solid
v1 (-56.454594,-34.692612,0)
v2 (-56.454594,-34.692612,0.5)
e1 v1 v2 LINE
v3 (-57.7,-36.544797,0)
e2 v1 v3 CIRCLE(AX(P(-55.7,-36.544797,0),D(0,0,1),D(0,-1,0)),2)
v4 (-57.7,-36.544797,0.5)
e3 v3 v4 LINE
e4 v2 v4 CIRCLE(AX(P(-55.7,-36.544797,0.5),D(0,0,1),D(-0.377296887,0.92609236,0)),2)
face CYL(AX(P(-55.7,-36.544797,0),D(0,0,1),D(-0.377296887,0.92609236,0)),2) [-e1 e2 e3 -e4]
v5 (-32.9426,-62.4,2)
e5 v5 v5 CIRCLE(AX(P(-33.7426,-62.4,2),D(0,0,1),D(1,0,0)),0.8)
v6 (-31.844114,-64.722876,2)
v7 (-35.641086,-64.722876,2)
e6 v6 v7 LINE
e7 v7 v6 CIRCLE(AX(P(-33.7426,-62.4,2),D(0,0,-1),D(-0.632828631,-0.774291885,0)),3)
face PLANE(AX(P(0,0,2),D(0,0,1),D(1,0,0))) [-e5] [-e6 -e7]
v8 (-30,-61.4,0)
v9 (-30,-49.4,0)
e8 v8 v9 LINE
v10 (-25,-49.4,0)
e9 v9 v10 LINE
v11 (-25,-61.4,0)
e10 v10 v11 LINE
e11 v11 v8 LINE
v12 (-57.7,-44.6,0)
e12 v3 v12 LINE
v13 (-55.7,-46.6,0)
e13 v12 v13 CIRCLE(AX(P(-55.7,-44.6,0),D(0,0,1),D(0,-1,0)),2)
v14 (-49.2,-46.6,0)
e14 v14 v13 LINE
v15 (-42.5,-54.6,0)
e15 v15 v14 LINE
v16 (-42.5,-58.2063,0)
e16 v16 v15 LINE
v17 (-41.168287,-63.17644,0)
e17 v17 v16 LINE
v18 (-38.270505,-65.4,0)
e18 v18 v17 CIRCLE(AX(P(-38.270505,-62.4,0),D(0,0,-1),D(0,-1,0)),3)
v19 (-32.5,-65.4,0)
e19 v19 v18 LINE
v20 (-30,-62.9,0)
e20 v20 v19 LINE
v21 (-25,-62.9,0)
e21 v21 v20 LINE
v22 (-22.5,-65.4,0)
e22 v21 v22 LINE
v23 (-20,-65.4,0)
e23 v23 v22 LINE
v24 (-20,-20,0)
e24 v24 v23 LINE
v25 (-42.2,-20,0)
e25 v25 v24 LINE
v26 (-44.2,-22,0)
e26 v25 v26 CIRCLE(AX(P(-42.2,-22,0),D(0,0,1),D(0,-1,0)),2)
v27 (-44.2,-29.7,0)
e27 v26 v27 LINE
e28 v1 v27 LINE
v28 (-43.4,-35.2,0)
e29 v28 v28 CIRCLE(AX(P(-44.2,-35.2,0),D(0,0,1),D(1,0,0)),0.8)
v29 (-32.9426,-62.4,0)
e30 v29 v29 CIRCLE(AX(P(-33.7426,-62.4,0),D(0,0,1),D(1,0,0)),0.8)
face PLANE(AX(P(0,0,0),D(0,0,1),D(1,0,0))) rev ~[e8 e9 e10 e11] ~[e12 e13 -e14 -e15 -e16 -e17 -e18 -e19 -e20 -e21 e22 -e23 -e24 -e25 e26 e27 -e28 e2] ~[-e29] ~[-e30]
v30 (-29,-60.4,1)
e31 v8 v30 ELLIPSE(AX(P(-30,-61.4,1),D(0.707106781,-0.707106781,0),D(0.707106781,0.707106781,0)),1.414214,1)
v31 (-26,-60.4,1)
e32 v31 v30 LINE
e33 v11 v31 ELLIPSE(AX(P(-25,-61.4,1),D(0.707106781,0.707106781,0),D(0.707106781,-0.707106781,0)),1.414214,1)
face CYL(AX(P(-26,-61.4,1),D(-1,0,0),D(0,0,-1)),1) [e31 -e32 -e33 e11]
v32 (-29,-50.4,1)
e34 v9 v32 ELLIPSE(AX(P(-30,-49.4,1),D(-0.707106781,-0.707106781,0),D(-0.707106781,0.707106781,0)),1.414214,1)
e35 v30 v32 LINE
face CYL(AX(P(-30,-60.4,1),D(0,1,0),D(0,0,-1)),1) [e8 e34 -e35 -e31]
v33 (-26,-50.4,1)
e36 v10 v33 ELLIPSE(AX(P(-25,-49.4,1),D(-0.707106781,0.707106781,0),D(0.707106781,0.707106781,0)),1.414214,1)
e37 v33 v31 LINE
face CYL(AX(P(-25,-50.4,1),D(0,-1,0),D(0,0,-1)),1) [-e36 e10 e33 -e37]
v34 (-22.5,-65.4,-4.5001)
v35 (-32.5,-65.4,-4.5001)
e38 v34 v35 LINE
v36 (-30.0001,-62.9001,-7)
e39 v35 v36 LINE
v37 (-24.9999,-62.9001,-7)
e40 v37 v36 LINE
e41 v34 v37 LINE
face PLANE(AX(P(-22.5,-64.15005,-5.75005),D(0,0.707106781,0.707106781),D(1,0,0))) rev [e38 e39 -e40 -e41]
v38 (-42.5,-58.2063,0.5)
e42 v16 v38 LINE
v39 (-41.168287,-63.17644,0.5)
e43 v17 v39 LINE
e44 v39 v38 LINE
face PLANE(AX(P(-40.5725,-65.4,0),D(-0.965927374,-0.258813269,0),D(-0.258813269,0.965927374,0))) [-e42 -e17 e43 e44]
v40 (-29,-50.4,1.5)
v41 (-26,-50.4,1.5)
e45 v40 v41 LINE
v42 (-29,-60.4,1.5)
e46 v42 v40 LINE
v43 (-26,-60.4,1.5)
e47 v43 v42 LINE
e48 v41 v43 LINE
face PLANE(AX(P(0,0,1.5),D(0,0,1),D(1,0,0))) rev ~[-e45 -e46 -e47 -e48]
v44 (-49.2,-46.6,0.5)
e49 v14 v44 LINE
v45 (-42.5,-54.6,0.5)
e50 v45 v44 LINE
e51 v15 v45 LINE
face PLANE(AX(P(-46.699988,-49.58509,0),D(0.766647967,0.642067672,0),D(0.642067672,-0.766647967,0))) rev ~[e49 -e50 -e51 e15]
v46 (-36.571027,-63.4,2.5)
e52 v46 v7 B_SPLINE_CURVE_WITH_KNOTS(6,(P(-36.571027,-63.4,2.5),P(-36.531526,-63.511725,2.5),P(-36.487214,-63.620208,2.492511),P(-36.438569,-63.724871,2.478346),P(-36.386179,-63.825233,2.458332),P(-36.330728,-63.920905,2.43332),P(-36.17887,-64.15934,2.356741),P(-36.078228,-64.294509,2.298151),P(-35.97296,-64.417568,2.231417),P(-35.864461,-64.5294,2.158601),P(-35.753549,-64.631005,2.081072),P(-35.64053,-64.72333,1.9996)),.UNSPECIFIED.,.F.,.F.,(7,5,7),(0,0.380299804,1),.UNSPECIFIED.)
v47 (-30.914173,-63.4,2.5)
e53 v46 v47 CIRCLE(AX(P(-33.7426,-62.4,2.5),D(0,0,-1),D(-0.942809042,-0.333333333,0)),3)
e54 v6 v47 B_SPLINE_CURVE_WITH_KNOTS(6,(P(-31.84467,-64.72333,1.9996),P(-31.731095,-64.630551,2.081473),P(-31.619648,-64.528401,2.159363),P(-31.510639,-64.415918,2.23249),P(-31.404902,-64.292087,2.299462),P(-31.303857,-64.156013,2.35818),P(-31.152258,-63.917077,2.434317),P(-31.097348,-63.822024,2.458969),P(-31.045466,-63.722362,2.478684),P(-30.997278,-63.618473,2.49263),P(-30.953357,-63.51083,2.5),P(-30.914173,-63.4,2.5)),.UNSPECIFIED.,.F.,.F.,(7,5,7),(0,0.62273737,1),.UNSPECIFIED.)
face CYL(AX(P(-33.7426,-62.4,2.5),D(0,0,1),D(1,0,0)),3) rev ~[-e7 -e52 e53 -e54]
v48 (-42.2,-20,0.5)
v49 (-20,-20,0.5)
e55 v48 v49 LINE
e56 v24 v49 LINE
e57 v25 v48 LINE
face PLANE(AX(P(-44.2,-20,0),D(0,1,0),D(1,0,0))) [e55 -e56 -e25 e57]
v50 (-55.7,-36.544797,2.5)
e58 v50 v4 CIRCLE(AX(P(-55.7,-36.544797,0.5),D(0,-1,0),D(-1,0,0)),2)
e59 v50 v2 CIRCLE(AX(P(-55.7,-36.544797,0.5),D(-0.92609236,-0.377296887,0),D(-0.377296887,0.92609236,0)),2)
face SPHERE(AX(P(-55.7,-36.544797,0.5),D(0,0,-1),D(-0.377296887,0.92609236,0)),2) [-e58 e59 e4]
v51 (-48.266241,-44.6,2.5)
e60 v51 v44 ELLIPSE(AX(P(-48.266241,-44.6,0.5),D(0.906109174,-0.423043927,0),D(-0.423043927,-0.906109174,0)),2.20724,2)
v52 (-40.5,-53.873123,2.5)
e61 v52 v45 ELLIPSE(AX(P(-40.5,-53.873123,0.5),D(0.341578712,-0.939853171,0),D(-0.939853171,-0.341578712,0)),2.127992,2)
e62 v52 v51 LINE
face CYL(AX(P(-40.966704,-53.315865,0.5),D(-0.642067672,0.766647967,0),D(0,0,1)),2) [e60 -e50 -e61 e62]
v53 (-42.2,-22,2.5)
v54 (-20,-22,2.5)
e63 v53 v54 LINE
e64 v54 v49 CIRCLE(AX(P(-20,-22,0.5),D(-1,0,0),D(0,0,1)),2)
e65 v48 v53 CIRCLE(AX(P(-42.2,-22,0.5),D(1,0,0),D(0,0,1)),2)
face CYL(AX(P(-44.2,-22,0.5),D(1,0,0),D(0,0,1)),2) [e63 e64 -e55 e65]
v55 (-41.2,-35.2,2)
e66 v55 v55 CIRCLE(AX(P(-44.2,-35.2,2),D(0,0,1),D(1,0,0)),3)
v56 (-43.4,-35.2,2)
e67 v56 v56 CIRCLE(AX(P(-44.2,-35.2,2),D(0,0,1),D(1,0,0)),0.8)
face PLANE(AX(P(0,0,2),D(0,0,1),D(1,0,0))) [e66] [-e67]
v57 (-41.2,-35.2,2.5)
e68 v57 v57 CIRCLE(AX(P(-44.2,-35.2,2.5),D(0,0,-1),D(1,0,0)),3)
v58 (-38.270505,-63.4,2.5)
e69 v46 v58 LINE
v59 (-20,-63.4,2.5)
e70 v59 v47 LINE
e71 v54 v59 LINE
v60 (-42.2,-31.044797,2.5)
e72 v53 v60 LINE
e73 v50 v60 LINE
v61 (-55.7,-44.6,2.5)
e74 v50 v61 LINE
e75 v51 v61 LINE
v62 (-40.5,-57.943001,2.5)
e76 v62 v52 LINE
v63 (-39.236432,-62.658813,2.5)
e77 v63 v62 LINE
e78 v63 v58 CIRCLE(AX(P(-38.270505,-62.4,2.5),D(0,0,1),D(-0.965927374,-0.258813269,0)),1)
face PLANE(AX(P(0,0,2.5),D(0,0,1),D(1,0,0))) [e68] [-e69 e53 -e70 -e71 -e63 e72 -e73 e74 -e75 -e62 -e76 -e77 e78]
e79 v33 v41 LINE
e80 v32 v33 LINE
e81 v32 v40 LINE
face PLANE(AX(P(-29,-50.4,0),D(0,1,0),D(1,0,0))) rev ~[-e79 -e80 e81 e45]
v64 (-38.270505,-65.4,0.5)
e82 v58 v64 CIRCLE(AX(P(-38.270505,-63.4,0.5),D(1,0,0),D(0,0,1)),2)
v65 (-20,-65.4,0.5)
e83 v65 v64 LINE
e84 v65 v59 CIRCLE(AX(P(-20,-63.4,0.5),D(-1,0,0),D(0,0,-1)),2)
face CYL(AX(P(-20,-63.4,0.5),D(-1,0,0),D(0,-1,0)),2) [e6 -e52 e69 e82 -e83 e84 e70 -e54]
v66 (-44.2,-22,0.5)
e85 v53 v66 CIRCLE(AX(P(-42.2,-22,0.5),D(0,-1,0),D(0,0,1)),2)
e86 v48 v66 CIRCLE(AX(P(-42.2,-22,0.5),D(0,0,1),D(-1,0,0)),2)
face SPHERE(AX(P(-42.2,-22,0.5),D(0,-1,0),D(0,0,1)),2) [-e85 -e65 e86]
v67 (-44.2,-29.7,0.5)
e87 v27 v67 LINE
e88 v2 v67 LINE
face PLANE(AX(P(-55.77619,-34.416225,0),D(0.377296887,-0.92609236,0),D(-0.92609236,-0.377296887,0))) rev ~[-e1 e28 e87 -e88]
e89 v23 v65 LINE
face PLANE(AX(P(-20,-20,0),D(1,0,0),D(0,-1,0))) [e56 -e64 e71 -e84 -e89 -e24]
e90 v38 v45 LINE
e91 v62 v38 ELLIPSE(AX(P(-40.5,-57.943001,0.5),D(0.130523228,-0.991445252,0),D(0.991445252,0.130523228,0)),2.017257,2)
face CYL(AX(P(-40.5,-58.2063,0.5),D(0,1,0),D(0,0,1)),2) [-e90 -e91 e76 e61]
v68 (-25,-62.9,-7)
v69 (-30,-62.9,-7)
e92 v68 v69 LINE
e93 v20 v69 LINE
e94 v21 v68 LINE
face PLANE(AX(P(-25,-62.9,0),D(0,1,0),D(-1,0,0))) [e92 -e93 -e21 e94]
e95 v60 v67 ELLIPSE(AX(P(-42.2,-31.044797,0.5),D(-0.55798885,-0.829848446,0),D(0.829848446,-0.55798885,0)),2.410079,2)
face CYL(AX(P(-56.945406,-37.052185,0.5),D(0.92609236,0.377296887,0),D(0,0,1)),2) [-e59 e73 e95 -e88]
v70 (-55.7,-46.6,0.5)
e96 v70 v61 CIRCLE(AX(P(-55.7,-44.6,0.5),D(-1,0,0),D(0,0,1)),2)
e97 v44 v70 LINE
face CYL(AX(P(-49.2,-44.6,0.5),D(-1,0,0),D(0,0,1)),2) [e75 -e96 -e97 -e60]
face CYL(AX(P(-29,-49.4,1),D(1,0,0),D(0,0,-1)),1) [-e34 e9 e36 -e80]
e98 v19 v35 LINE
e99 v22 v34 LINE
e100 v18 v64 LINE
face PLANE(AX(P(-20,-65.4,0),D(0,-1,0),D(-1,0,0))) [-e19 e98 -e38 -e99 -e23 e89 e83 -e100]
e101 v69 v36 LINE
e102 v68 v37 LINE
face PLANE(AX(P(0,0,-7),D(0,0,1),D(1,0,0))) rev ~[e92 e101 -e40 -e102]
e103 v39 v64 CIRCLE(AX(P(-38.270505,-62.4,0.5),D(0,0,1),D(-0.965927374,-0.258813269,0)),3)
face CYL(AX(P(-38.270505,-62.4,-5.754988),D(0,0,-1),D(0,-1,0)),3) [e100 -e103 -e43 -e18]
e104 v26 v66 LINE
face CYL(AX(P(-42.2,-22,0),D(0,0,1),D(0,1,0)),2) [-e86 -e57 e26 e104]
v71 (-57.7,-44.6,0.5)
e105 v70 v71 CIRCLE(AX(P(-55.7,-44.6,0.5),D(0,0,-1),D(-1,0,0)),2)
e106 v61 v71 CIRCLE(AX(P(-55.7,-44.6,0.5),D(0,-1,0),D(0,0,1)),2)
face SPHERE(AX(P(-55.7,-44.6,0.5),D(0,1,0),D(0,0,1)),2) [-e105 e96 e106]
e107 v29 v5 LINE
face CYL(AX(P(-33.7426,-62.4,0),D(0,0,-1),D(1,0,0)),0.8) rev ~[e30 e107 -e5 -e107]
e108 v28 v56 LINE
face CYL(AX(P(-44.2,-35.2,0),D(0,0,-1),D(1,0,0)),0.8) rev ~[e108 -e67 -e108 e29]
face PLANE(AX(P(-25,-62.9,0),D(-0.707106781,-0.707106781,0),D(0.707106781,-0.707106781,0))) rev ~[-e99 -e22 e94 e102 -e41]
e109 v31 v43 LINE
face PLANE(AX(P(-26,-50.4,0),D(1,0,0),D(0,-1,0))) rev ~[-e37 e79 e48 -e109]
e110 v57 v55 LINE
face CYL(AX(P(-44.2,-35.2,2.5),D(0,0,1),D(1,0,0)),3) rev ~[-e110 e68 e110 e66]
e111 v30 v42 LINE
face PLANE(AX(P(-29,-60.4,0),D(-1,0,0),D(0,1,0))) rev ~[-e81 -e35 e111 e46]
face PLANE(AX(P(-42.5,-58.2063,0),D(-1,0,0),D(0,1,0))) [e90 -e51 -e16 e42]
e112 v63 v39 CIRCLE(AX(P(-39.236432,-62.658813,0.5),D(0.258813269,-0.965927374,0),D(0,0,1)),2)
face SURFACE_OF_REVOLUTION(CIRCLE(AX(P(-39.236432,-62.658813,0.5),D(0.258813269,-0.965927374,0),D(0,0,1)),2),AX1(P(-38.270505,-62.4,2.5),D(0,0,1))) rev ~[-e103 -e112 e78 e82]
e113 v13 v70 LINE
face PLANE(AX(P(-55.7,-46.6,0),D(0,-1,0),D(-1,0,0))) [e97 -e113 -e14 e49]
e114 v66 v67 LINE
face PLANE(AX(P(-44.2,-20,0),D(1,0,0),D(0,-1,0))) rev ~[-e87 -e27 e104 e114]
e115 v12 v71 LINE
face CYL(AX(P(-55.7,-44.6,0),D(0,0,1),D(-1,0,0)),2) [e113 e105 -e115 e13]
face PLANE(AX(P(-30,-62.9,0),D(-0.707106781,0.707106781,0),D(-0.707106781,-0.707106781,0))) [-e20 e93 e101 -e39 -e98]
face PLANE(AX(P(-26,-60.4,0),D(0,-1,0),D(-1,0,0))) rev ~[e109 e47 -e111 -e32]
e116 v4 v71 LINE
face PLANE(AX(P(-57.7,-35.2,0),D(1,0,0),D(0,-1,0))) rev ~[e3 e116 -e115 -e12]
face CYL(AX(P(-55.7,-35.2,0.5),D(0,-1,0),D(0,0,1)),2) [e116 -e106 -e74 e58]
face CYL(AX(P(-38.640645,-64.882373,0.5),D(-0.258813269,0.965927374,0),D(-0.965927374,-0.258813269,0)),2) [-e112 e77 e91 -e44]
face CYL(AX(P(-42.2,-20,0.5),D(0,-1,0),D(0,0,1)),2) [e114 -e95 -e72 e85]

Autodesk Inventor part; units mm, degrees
ref_plane "YZ Plane" through (0, 0, 0) normal (1, 0, 0) x (0, 1, 0)
ref_plane "XZ Plane" through (0, 0, 0) normal (0, 1, 0) x (-1, 0, 0)
ref_plane "XY Plane" through (0, 0, 0) normal (0, 0, 1) x (1, 0, 0)
sketch "Эскиз1" plane through (0, 0, 0) normal (0, 0, 1) x (1, 0, 0)
  line L0 (-41.7, -37.7) -> (-41.7, -22.5)
  line L1 (-41.7, -22.5) -> (-37.5, -22.5)
  line L2 (-37.5, -22.5) -> (-37.5, -24.2)
  line L3 (-37.5, -24.2) -> (-27.2, -24.2)
  line L4 (-27.2, -24.2) -> (-27.2, -22.5)
  line L5 (-27.2, -22.5) -> (-25, -22.5)
  line L6 (-25, -22.5) -> (-25, -24.2)
  line L7 (-25, -24.2) -> (-22.5, -24.2)
  line L8 (-22.5, -24.2) -> (-22.5, -61.2)
  line L9 (-22.5, -61.2) -> (-25, -61.2)
  line L10 (-25, -61.2) -> (-25, -62.9)
  line L11 (-25, -62.9) -> (-40, -62.9)
  line L12 (-40, -62.9) -> (-40, -55.0851)
  line L13 (-44.2, -20) -> (-20, -20)
  line L14 (-20, -20) -> (-20, -65.4)
  line L15 (-60, -70) -> (-20, -70)
  line L16 (-20, -65.4) -> (-42.5, -65.4)
  line L17 (-41.7, -37.7) -> (-55.2, -37.7)
  line L18 (-44.2, -20) -> (-44.2, -29.7)
  line L19 (-55.2, -37.7) -> (-55.2, -44.1)
  line L20 (-44.2, -29.7) -> (-57.7, -35.2)
  line L21 (-57.7, -35.2) -> (-57.7, -46.6)
  line L22 (-60, -20) -> (-60, -70)
  line L23 (-42.5, -65.4) -> (-42.5, -54.6)
  line L24 (-55.2, -44.1) -> (-53.2, -44.1)
  line L25 (-53.2, -44.1) -> (-53.2, -46.6)
  line L26 (-53.2, -46.6) -> (-57.7, -46.6)
  line L27 (-49.2, -44.1) -> (-49.2, -46.6)
  line L28 (-49.2, -46.6) -> (-42.5, -54.6)
  line L29 (-49.2, -44.1) -> (-40, -55.0851)
  line L30 (-49.2, -44.1) -> (-46.2, -44.1)
  line L31 (-46.2, -44.1) -> (-46.2, -47.6821)
  line L32 (-25, -62.9) -> (-22.5, -65.4)
  line L33 (-30, -62.9) -> (-32.5, -65.4)
  line L34 (-46.2, -44.1) -> (-46.2, -37.7)
  line L35 (-20, -70) -> (-20, -20)
  line L36 (-20, -20) -> (-60, -20)
  line L37 (-53.2, -46.6) -> (-49.2, -46.6)
  line L38 (-53.2, -44.1) -> (-55.7, -46.6)
  line L39 (-49.2, -44.1) -> (-46.7, -49.5851)
  circle A0 centre (-54.1298, -30.506) radius 0.8
  circle A1 centre (-54.1298, -30.506) radius 3
  line L40 (-55.7762, -34.4162) -> (-56.908, -31.6379)
  line L41 (-50.2196, -32.1524) -> (-51.3515, -29.3742)
  circle A2 centre (-33.7426, -62.4) radius 0.8
  circle A3 centre (-33.7426, -62.4) radius 3
  line L42 (-29, -50.4) -> (-26, -50.4)
  line L43 (-26, -50.4) -> (-26, -60.4)
  line L44 (-26, -60.4) -> (-29, -60.4)
  line L45 (-29, -60.4) -> (-29, -50.4)
  circle A4 centre (-44.2, -35.2) radius 0.8
  circle A5 centre (-44.2, -35.2) radius 3
  line L46 (-40.5725, -65.4) -> (-42.5, -58.2063)
  point P0 (0, 0)
  point P1 (-44.2, -20)
  point P2 (-42.5417, -37.7)
  point P3 (-41.7, -36.8583)
  point P4 (-41.7, -33.5417)
  point P5 (-45.8583, -37.7)
  dimension "d0" = 16.7
  dimension "d1" = 4.2
  dimension "d2" = 2.2
  dimension "d3" = 1.7
  dimension "d4" = 40.4
  dimension "d5" = 1.7
  dimension "d6" = 2.5
  dimension "d7" = 15
  dimension "d8" = 2.5
  dimension "d9" = 2.5
  dimension "d10" = 2.5
  dimension "d11" = 15.2
  dimension "d12" = 2.5
  dimension "d14" = 2.5
  dimension "d15" = 2.5
  dimension "d16" = 8
  dimension "d17" = 2.5
  dimension "d18" = 6.4
  dimension "d19" = 2.5
  dimension "d20" = 2
  dimension "d21" = 4
  dimension "d22" = 2.5
  dimension "d23" = 3
  dimension "d24" = 5
  dimension "d25" = 2.5
  dimension "d26" = 8
  dimension "d27" = 2.5
  dimension "d28" = 2.5
  dimension "d29" = 2.5
  dimension "d30" = 20
  dimension "d31" = 20
  dimension "d32" = 50
  dimension "d33" = 40
  dimension "d44" = 37.7
  dimension "d55" = 1.6
  dimension "d57" = 6
  dimension "d58" = 6.5
  dimension "d60" = 1.6
  dimension "d61" = 6
  dimension "d66" = 6
  dimension "d67" = 9
  dimension "d68" = 5
  dimension "d69" = 15
  dimension "d77" = 1.6
  dimension "d78" = 6
  dimension "d80" = 15.2
  dimension "d81" = 24.2
  dimension "d83" = 15
  dimension "d84" = 1.2
extrude "Выдавливание1" add sketch "Эскиз1" along normal blind 2.5 contours L17 A5 L0 | L0 A5 L1 L2 L3 L4 L5 L6 L7 L8 L9 L10 L11 A3 L12 L29 L31 L34 L17 | A5 L17 L0 | L0 A5 | A5 L17 | A5 L17 L19 L24 L38 L26 L21 L20 L18 L13 L14 L16 L32 L10 L9 L8 L7 L6 L5 L4 L3 L2 L1 L0 | L34 L30 L27 L37 L25 L24 L19 L17 | L31 L29 L30 | L39 L28 L27 | L29 L12 L11 A3 L16 L46 L23 L28 L39 | L25 L26 L38 | A3 L11 A2 | L11 A2 A3 | A3 L33 L16 | L11 L33 A3 | L33 L11 L32 L16 | L42 L43 L44 L45
extrude "Выдавливание3" add sketch "Эскиз1" against normal blind 7 contours L33 L11 L32 L16
chamfer "Фаска1" distance 2.5 angle 45 1 edges at (-27.5, -65.4, -7)
fillet "Сопряжение1" radius 2 12 edges at (-44.2, -24.85, 2.5) (-50.95, -32.45, 2.5) (-57.7, -40.9, 2.5) (-53.45, -46.6, 2.5) (-45.85, -50.6, 2.5) (-42.5, -56.4032, 2.5) (-30.2862, -65.4, 2.5) (-57.7, -46.6, 1.25) (-57.7, -35.2, 1.25) (-32.1, -20, 2.5) (-44.2, -20, 1.25) (-41.5362, -61.8032, 2.5)
extrude "Выдавливание4" cut sketch "Эскиз1" against normal blind 0.5 from surface at 2.5 contours A5 L17 L0 | L0 A5 | A5 L17 | A3 L11 A2 | L11 A2 A3 picked at (-44.1679, -37.1314)
extrude "Выдавливание5" cut sketch "Эскиз1" along normal blind 1.5 contours L42 L43 L44 L45
fillet "Сопряжение3" radius 1 4 edges at (-29, -55.4, 0) (-27.5, -50.4, 0) (-26, -55.4, 0) (-27.5, -60.4, 0)
fillet "Сопряжение4" radius 3 2 edges at (-40.5725, -65.4, 0.25) (-40.123, -64.8142, 1.9142)
properties part number "Top_3DПЕЧАТЬ"
